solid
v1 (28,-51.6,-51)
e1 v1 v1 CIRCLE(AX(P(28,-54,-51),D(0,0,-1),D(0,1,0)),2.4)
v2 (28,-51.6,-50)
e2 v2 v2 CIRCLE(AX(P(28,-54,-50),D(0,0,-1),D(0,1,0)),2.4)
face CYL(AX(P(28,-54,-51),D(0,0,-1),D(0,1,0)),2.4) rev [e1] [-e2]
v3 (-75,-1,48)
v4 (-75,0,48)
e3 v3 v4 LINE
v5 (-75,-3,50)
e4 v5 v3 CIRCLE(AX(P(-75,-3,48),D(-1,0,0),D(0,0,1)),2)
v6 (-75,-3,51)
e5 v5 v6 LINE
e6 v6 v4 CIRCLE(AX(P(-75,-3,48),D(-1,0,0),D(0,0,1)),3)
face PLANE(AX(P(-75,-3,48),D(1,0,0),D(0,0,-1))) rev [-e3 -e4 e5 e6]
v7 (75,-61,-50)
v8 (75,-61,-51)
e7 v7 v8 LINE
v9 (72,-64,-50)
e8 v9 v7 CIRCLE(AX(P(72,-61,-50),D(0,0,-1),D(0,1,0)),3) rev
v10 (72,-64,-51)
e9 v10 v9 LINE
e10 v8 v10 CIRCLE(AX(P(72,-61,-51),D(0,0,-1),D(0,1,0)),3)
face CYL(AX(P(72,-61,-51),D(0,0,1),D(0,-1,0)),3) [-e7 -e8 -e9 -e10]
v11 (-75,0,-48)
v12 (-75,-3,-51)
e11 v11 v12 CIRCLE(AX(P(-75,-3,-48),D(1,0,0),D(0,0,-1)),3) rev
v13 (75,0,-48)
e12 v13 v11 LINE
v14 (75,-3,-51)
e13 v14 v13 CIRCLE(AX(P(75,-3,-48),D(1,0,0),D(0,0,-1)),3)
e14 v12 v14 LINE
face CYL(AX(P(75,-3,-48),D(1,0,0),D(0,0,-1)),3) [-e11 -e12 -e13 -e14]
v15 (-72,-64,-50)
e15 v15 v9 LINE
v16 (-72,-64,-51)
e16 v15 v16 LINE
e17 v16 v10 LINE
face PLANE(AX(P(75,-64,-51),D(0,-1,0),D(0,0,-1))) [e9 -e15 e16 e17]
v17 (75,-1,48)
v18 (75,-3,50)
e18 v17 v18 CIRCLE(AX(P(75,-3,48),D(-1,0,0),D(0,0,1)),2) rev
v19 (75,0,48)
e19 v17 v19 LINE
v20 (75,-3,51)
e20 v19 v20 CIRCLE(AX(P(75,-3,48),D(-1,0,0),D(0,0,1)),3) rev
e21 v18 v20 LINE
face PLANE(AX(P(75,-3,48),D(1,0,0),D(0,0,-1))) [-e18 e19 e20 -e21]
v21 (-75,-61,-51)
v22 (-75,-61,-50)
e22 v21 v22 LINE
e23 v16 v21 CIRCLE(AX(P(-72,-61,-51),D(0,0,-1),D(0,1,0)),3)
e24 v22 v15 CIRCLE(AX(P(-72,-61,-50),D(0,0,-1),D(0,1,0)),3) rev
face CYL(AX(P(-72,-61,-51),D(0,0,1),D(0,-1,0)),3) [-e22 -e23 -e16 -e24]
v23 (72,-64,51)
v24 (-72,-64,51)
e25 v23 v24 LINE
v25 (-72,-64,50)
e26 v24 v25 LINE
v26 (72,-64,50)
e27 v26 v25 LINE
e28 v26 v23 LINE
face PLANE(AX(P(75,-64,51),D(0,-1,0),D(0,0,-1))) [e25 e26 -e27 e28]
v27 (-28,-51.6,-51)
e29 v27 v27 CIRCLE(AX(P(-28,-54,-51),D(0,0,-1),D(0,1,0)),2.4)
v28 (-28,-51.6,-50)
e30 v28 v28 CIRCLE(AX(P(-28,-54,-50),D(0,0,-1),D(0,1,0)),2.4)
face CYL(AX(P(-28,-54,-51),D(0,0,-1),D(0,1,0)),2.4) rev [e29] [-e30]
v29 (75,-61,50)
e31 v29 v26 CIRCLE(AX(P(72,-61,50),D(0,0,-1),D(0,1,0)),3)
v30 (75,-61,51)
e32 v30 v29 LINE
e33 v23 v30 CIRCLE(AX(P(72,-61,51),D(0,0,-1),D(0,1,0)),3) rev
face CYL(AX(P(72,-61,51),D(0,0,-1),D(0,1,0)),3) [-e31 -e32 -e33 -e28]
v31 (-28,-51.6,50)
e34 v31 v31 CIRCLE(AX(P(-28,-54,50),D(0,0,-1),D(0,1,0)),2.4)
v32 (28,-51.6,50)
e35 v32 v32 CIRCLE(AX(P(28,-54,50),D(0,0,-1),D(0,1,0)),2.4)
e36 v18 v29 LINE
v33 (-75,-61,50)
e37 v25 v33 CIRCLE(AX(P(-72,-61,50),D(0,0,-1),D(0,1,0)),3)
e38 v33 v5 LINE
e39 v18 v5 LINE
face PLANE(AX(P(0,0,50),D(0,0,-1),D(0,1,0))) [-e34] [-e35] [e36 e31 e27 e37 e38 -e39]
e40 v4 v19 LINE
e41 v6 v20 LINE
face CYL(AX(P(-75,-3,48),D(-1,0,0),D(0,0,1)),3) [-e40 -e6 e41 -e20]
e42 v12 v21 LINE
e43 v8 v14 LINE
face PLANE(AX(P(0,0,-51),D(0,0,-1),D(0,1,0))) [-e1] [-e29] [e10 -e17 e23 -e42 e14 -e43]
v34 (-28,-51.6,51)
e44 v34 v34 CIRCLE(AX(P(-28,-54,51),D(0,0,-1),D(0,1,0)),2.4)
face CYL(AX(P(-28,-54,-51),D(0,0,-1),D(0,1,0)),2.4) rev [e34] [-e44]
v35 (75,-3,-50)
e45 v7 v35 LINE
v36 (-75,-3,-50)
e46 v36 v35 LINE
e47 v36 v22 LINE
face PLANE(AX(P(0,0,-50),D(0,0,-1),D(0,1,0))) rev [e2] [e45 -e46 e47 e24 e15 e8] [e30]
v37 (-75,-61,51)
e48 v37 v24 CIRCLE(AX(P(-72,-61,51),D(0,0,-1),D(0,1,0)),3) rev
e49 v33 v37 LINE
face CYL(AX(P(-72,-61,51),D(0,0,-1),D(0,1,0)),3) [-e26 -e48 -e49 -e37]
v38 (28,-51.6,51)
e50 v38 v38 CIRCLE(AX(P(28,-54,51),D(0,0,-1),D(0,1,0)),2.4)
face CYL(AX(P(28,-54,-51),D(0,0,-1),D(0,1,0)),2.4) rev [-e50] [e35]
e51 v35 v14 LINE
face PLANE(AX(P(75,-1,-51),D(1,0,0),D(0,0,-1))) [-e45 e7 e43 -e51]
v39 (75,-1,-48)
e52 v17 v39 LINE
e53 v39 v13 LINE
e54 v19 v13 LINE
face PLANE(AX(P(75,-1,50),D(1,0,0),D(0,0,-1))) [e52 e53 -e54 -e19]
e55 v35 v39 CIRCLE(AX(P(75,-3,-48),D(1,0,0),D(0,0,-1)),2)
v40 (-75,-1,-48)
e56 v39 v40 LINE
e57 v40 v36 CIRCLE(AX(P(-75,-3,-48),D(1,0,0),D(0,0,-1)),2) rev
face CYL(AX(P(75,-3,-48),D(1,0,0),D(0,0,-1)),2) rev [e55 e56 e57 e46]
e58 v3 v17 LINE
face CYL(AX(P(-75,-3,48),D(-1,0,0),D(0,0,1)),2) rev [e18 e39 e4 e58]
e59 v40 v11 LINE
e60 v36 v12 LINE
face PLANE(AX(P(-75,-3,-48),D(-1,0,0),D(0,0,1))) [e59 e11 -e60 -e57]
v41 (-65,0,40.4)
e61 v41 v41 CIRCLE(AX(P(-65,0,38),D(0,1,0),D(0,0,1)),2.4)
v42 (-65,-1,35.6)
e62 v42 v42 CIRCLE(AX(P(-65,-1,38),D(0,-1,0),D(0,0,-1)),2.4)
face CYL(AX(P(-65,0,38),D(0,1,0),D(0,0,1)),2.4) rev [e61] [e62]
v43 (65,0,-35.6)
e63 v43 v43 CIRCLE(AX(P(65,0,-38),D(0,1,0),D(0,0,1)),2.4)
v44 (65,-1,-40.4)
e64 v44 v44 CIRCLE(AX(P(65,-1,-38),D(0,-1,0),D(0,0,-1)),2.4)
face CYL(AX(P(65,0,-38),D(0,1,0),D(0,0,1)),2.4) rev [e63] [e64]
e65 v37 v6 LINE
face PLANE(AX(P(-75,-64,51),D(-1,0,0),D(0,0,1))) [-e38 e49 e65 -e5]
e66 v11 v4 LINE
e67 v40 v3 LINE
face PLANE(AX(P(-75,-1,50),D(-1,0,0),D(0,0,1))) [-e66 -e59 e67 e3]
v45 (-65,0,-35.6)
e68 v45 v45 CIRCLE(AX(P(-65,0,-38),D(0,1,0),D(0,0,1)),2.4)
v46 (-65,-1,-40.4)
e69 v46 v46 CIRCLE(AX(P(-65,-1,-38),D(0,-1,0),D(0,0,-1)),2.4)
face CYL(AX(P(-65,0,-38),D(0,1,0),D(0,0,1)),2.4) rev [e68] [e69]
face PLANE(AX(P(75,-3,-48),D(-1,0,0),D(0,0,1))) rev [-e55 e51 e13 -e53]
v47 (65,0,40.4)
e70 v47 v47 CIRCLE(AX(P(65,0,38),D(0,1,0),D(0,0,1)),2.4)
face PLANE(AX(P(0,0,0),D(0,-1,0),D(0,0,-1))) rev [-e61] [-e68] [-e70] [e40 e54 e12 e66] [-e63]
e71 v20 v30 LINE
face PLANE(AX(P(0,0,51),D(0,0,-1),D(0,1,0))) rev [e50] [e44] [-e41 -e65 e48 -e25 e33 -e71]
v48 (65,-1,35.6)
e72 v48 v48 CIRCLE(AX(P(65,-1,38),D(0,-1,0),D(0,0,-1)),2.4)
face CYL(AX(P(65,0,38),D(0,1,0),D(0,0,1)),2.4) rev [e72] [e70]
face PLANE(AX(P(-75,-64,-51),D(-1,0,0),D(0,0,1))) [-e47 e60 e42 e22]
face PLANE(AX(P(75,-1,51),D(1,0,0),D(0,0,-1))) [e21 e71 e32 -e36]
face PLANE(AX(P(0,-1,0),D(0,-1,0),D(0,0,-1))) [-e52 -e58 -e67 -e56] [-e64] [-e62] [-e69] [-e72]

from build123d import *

# Parameters (mm, degrees)
SKETCH1_W                      = 150
SKETCH1_H                      = 100
BASE_FLANGE1_DEPTH             = 1
EDGE_FLANGE1_STRIP_W           = 8
EDGE_FLANGE1_STRIP_H           = 1
EDGE_FLANGE1_STRIP_CUT_DEPTH   = 150
EDGE_FLANGE1_STRIP_2_W         = 8
EDGE_FLANGE1_STRIP_2_H         = 1
EDGE_FLANGE1_STRIP_CUT_2_DEPTH = 150
EDGE_FLANGE1_DEPTH             = 150
EDGE_FLANGE1_BEND_DEPTH        = 150
BREAK_CORNER1_START            = -51
BREAK_CORNER1_DEPTH            = 102
M4_CLEARANCE_HOLE1_D           = 4.8
M4_CLEARANCE_HOLE2_D           = 4.8


# Read off the part's stored shape, not the designer's step: Break-Corner1
# Sheet-metal steps are written as plain solids
with BuildPart() as part:
    # Sketch1 → Base-Flange1 (new body)
    with BuildSketch(Plane(origin=(0, 0, 0), x_dir=(1, 0, 0), z_dir=(0, 1, 0))):
        Rectangle(SKETCH1_W, SKETCH1_H)
    extrude(amount=-BASE_FLANGE1_DEPTH)

    # Edge-Flange1 strip (across the edge) → Edge-Flange1 strip cut (cut)
    with BuildSketch(Plane(origin=(-75, -1, -50), x_dir=(0, 0, 1), z_dir=(1, 0, 0))):
        with Locations((-2, -0.5)):
            Rectangle(EDGE_FLANGE1_STRIP_W, EDGE_FLANGE1_STRIP_H)
    extrude(amount=EDGE_FLANGE1_STRIP_CUT_DEPTH, mode=Mode.SUBTRACT)

    # Edge-Flange1 strip 2 (across the edge) → Edge-Flange1 strip cut 2 (cut)
    with BuildSketch(Plane(origin=(75, -1, 50), x_dir=(0, 0, -1), z_dir=(-1, 0, 0))):
        with Locations((-2, -0.5)):
            Rectangle(EDGE_FLANGE1_STRIP_2_W, EDGE_FLANGE1_STRIP_2_H)
    extrude(amount=EDGE_FLANGE1_STRIP_CUT_2_DEPTH, mode=Mode.SUBTRACT)

    # Edge-Flange1 section (across the edge) → Edge-Flange1 (add)
    with BuildSketch(Plane(origin=(-75, -1, -50), x_dir=(0, 0, 1), z_dir=(1, 0, 0))):
        with BuildLine():
            Line((-1, 2), (-1, 63))
            Line((-1, 63), (0, 63))
            Line((0, 63), (0, 2))
            ThreePointArc((0, 2), (0.585786438, 0.585786438), (2, 0))
            Line((2, 0), (2, -1))
            ThreePointArc((2, -1), (-0.121320344, -0.121320344), (-1, 2))
        make_face()
    extrude(amount=EDGE_FLANGE1_DEPTH)

    # Edge-Flange1 section 2 (across the edge) → Edge-Flange1 bend (add)
    with BuildSketch(Plane(origin=(75, -1, 50), x_dir=(0, 0, -1), z_dir=(-1, 0, 0))):
        with BuildLine():
            Line((-1, 2), (-1, 63))
            Line((-1, 63), (0, 63))
            Line((0, 63), (0, 2))
            ThreePointArc((0, 2), (0.585786438, 0.585786438), (2, 0))
            Line((2, 0), (2, -1))
            ThreePointArc((2, -1), (-0.121320344, -0.121320344), (-1, 2))
        make_face()
    extrude(amount=EDGE_FLANGE1_BEND_DEPTH)

    # Break-Corner1 outline → Break-Corner1 (cut)
    with BuildSketch(Plane.XY.offset(BREAK_CORNER1_START)):
        with BuildLine():
            Line((-75, -64), (-72, -64))
            ThreePointArc((-72, -64), (-74.121320344, -63.121320344), (-75, -61))
            Line((-75, -61), (-75, -64))
        make_face()
        with BuildLine():
            ThreePointArc((75, -61), (74.121320344, -63.121320344), (72, -64))
            Line((72, -64), (75, -64))
            Line((75, -64), (75, -61))
        make_face()
    extrude(amount=BREAK_CORNER1_DEPTH, mode=Mode.SUBTRACT)

    # M4 Clearance Hole1 (through all)
    with Locations(Plane(origin=(0, 0, -51), x_dir=(-1, 0, 0), z_dir=(0, 0, -1))):
        with Locations((-28, -54), (28, -54)):
            Hole(M4_CLEARANCE_HOLE1_D / 2)

    # M4 Clearance Hole2 (through all)
    with Locations(Plane(origin=(0, 0, 0), x_dir=(1, 0, 0), z_dir=(0, 1, 0))):
        with Locations((-65, 38), (-65, -38), (65, -38), (65, 38)):
            Hole(M4_CLEARANCE_HOLE2_D / 2)


solid = part.part
